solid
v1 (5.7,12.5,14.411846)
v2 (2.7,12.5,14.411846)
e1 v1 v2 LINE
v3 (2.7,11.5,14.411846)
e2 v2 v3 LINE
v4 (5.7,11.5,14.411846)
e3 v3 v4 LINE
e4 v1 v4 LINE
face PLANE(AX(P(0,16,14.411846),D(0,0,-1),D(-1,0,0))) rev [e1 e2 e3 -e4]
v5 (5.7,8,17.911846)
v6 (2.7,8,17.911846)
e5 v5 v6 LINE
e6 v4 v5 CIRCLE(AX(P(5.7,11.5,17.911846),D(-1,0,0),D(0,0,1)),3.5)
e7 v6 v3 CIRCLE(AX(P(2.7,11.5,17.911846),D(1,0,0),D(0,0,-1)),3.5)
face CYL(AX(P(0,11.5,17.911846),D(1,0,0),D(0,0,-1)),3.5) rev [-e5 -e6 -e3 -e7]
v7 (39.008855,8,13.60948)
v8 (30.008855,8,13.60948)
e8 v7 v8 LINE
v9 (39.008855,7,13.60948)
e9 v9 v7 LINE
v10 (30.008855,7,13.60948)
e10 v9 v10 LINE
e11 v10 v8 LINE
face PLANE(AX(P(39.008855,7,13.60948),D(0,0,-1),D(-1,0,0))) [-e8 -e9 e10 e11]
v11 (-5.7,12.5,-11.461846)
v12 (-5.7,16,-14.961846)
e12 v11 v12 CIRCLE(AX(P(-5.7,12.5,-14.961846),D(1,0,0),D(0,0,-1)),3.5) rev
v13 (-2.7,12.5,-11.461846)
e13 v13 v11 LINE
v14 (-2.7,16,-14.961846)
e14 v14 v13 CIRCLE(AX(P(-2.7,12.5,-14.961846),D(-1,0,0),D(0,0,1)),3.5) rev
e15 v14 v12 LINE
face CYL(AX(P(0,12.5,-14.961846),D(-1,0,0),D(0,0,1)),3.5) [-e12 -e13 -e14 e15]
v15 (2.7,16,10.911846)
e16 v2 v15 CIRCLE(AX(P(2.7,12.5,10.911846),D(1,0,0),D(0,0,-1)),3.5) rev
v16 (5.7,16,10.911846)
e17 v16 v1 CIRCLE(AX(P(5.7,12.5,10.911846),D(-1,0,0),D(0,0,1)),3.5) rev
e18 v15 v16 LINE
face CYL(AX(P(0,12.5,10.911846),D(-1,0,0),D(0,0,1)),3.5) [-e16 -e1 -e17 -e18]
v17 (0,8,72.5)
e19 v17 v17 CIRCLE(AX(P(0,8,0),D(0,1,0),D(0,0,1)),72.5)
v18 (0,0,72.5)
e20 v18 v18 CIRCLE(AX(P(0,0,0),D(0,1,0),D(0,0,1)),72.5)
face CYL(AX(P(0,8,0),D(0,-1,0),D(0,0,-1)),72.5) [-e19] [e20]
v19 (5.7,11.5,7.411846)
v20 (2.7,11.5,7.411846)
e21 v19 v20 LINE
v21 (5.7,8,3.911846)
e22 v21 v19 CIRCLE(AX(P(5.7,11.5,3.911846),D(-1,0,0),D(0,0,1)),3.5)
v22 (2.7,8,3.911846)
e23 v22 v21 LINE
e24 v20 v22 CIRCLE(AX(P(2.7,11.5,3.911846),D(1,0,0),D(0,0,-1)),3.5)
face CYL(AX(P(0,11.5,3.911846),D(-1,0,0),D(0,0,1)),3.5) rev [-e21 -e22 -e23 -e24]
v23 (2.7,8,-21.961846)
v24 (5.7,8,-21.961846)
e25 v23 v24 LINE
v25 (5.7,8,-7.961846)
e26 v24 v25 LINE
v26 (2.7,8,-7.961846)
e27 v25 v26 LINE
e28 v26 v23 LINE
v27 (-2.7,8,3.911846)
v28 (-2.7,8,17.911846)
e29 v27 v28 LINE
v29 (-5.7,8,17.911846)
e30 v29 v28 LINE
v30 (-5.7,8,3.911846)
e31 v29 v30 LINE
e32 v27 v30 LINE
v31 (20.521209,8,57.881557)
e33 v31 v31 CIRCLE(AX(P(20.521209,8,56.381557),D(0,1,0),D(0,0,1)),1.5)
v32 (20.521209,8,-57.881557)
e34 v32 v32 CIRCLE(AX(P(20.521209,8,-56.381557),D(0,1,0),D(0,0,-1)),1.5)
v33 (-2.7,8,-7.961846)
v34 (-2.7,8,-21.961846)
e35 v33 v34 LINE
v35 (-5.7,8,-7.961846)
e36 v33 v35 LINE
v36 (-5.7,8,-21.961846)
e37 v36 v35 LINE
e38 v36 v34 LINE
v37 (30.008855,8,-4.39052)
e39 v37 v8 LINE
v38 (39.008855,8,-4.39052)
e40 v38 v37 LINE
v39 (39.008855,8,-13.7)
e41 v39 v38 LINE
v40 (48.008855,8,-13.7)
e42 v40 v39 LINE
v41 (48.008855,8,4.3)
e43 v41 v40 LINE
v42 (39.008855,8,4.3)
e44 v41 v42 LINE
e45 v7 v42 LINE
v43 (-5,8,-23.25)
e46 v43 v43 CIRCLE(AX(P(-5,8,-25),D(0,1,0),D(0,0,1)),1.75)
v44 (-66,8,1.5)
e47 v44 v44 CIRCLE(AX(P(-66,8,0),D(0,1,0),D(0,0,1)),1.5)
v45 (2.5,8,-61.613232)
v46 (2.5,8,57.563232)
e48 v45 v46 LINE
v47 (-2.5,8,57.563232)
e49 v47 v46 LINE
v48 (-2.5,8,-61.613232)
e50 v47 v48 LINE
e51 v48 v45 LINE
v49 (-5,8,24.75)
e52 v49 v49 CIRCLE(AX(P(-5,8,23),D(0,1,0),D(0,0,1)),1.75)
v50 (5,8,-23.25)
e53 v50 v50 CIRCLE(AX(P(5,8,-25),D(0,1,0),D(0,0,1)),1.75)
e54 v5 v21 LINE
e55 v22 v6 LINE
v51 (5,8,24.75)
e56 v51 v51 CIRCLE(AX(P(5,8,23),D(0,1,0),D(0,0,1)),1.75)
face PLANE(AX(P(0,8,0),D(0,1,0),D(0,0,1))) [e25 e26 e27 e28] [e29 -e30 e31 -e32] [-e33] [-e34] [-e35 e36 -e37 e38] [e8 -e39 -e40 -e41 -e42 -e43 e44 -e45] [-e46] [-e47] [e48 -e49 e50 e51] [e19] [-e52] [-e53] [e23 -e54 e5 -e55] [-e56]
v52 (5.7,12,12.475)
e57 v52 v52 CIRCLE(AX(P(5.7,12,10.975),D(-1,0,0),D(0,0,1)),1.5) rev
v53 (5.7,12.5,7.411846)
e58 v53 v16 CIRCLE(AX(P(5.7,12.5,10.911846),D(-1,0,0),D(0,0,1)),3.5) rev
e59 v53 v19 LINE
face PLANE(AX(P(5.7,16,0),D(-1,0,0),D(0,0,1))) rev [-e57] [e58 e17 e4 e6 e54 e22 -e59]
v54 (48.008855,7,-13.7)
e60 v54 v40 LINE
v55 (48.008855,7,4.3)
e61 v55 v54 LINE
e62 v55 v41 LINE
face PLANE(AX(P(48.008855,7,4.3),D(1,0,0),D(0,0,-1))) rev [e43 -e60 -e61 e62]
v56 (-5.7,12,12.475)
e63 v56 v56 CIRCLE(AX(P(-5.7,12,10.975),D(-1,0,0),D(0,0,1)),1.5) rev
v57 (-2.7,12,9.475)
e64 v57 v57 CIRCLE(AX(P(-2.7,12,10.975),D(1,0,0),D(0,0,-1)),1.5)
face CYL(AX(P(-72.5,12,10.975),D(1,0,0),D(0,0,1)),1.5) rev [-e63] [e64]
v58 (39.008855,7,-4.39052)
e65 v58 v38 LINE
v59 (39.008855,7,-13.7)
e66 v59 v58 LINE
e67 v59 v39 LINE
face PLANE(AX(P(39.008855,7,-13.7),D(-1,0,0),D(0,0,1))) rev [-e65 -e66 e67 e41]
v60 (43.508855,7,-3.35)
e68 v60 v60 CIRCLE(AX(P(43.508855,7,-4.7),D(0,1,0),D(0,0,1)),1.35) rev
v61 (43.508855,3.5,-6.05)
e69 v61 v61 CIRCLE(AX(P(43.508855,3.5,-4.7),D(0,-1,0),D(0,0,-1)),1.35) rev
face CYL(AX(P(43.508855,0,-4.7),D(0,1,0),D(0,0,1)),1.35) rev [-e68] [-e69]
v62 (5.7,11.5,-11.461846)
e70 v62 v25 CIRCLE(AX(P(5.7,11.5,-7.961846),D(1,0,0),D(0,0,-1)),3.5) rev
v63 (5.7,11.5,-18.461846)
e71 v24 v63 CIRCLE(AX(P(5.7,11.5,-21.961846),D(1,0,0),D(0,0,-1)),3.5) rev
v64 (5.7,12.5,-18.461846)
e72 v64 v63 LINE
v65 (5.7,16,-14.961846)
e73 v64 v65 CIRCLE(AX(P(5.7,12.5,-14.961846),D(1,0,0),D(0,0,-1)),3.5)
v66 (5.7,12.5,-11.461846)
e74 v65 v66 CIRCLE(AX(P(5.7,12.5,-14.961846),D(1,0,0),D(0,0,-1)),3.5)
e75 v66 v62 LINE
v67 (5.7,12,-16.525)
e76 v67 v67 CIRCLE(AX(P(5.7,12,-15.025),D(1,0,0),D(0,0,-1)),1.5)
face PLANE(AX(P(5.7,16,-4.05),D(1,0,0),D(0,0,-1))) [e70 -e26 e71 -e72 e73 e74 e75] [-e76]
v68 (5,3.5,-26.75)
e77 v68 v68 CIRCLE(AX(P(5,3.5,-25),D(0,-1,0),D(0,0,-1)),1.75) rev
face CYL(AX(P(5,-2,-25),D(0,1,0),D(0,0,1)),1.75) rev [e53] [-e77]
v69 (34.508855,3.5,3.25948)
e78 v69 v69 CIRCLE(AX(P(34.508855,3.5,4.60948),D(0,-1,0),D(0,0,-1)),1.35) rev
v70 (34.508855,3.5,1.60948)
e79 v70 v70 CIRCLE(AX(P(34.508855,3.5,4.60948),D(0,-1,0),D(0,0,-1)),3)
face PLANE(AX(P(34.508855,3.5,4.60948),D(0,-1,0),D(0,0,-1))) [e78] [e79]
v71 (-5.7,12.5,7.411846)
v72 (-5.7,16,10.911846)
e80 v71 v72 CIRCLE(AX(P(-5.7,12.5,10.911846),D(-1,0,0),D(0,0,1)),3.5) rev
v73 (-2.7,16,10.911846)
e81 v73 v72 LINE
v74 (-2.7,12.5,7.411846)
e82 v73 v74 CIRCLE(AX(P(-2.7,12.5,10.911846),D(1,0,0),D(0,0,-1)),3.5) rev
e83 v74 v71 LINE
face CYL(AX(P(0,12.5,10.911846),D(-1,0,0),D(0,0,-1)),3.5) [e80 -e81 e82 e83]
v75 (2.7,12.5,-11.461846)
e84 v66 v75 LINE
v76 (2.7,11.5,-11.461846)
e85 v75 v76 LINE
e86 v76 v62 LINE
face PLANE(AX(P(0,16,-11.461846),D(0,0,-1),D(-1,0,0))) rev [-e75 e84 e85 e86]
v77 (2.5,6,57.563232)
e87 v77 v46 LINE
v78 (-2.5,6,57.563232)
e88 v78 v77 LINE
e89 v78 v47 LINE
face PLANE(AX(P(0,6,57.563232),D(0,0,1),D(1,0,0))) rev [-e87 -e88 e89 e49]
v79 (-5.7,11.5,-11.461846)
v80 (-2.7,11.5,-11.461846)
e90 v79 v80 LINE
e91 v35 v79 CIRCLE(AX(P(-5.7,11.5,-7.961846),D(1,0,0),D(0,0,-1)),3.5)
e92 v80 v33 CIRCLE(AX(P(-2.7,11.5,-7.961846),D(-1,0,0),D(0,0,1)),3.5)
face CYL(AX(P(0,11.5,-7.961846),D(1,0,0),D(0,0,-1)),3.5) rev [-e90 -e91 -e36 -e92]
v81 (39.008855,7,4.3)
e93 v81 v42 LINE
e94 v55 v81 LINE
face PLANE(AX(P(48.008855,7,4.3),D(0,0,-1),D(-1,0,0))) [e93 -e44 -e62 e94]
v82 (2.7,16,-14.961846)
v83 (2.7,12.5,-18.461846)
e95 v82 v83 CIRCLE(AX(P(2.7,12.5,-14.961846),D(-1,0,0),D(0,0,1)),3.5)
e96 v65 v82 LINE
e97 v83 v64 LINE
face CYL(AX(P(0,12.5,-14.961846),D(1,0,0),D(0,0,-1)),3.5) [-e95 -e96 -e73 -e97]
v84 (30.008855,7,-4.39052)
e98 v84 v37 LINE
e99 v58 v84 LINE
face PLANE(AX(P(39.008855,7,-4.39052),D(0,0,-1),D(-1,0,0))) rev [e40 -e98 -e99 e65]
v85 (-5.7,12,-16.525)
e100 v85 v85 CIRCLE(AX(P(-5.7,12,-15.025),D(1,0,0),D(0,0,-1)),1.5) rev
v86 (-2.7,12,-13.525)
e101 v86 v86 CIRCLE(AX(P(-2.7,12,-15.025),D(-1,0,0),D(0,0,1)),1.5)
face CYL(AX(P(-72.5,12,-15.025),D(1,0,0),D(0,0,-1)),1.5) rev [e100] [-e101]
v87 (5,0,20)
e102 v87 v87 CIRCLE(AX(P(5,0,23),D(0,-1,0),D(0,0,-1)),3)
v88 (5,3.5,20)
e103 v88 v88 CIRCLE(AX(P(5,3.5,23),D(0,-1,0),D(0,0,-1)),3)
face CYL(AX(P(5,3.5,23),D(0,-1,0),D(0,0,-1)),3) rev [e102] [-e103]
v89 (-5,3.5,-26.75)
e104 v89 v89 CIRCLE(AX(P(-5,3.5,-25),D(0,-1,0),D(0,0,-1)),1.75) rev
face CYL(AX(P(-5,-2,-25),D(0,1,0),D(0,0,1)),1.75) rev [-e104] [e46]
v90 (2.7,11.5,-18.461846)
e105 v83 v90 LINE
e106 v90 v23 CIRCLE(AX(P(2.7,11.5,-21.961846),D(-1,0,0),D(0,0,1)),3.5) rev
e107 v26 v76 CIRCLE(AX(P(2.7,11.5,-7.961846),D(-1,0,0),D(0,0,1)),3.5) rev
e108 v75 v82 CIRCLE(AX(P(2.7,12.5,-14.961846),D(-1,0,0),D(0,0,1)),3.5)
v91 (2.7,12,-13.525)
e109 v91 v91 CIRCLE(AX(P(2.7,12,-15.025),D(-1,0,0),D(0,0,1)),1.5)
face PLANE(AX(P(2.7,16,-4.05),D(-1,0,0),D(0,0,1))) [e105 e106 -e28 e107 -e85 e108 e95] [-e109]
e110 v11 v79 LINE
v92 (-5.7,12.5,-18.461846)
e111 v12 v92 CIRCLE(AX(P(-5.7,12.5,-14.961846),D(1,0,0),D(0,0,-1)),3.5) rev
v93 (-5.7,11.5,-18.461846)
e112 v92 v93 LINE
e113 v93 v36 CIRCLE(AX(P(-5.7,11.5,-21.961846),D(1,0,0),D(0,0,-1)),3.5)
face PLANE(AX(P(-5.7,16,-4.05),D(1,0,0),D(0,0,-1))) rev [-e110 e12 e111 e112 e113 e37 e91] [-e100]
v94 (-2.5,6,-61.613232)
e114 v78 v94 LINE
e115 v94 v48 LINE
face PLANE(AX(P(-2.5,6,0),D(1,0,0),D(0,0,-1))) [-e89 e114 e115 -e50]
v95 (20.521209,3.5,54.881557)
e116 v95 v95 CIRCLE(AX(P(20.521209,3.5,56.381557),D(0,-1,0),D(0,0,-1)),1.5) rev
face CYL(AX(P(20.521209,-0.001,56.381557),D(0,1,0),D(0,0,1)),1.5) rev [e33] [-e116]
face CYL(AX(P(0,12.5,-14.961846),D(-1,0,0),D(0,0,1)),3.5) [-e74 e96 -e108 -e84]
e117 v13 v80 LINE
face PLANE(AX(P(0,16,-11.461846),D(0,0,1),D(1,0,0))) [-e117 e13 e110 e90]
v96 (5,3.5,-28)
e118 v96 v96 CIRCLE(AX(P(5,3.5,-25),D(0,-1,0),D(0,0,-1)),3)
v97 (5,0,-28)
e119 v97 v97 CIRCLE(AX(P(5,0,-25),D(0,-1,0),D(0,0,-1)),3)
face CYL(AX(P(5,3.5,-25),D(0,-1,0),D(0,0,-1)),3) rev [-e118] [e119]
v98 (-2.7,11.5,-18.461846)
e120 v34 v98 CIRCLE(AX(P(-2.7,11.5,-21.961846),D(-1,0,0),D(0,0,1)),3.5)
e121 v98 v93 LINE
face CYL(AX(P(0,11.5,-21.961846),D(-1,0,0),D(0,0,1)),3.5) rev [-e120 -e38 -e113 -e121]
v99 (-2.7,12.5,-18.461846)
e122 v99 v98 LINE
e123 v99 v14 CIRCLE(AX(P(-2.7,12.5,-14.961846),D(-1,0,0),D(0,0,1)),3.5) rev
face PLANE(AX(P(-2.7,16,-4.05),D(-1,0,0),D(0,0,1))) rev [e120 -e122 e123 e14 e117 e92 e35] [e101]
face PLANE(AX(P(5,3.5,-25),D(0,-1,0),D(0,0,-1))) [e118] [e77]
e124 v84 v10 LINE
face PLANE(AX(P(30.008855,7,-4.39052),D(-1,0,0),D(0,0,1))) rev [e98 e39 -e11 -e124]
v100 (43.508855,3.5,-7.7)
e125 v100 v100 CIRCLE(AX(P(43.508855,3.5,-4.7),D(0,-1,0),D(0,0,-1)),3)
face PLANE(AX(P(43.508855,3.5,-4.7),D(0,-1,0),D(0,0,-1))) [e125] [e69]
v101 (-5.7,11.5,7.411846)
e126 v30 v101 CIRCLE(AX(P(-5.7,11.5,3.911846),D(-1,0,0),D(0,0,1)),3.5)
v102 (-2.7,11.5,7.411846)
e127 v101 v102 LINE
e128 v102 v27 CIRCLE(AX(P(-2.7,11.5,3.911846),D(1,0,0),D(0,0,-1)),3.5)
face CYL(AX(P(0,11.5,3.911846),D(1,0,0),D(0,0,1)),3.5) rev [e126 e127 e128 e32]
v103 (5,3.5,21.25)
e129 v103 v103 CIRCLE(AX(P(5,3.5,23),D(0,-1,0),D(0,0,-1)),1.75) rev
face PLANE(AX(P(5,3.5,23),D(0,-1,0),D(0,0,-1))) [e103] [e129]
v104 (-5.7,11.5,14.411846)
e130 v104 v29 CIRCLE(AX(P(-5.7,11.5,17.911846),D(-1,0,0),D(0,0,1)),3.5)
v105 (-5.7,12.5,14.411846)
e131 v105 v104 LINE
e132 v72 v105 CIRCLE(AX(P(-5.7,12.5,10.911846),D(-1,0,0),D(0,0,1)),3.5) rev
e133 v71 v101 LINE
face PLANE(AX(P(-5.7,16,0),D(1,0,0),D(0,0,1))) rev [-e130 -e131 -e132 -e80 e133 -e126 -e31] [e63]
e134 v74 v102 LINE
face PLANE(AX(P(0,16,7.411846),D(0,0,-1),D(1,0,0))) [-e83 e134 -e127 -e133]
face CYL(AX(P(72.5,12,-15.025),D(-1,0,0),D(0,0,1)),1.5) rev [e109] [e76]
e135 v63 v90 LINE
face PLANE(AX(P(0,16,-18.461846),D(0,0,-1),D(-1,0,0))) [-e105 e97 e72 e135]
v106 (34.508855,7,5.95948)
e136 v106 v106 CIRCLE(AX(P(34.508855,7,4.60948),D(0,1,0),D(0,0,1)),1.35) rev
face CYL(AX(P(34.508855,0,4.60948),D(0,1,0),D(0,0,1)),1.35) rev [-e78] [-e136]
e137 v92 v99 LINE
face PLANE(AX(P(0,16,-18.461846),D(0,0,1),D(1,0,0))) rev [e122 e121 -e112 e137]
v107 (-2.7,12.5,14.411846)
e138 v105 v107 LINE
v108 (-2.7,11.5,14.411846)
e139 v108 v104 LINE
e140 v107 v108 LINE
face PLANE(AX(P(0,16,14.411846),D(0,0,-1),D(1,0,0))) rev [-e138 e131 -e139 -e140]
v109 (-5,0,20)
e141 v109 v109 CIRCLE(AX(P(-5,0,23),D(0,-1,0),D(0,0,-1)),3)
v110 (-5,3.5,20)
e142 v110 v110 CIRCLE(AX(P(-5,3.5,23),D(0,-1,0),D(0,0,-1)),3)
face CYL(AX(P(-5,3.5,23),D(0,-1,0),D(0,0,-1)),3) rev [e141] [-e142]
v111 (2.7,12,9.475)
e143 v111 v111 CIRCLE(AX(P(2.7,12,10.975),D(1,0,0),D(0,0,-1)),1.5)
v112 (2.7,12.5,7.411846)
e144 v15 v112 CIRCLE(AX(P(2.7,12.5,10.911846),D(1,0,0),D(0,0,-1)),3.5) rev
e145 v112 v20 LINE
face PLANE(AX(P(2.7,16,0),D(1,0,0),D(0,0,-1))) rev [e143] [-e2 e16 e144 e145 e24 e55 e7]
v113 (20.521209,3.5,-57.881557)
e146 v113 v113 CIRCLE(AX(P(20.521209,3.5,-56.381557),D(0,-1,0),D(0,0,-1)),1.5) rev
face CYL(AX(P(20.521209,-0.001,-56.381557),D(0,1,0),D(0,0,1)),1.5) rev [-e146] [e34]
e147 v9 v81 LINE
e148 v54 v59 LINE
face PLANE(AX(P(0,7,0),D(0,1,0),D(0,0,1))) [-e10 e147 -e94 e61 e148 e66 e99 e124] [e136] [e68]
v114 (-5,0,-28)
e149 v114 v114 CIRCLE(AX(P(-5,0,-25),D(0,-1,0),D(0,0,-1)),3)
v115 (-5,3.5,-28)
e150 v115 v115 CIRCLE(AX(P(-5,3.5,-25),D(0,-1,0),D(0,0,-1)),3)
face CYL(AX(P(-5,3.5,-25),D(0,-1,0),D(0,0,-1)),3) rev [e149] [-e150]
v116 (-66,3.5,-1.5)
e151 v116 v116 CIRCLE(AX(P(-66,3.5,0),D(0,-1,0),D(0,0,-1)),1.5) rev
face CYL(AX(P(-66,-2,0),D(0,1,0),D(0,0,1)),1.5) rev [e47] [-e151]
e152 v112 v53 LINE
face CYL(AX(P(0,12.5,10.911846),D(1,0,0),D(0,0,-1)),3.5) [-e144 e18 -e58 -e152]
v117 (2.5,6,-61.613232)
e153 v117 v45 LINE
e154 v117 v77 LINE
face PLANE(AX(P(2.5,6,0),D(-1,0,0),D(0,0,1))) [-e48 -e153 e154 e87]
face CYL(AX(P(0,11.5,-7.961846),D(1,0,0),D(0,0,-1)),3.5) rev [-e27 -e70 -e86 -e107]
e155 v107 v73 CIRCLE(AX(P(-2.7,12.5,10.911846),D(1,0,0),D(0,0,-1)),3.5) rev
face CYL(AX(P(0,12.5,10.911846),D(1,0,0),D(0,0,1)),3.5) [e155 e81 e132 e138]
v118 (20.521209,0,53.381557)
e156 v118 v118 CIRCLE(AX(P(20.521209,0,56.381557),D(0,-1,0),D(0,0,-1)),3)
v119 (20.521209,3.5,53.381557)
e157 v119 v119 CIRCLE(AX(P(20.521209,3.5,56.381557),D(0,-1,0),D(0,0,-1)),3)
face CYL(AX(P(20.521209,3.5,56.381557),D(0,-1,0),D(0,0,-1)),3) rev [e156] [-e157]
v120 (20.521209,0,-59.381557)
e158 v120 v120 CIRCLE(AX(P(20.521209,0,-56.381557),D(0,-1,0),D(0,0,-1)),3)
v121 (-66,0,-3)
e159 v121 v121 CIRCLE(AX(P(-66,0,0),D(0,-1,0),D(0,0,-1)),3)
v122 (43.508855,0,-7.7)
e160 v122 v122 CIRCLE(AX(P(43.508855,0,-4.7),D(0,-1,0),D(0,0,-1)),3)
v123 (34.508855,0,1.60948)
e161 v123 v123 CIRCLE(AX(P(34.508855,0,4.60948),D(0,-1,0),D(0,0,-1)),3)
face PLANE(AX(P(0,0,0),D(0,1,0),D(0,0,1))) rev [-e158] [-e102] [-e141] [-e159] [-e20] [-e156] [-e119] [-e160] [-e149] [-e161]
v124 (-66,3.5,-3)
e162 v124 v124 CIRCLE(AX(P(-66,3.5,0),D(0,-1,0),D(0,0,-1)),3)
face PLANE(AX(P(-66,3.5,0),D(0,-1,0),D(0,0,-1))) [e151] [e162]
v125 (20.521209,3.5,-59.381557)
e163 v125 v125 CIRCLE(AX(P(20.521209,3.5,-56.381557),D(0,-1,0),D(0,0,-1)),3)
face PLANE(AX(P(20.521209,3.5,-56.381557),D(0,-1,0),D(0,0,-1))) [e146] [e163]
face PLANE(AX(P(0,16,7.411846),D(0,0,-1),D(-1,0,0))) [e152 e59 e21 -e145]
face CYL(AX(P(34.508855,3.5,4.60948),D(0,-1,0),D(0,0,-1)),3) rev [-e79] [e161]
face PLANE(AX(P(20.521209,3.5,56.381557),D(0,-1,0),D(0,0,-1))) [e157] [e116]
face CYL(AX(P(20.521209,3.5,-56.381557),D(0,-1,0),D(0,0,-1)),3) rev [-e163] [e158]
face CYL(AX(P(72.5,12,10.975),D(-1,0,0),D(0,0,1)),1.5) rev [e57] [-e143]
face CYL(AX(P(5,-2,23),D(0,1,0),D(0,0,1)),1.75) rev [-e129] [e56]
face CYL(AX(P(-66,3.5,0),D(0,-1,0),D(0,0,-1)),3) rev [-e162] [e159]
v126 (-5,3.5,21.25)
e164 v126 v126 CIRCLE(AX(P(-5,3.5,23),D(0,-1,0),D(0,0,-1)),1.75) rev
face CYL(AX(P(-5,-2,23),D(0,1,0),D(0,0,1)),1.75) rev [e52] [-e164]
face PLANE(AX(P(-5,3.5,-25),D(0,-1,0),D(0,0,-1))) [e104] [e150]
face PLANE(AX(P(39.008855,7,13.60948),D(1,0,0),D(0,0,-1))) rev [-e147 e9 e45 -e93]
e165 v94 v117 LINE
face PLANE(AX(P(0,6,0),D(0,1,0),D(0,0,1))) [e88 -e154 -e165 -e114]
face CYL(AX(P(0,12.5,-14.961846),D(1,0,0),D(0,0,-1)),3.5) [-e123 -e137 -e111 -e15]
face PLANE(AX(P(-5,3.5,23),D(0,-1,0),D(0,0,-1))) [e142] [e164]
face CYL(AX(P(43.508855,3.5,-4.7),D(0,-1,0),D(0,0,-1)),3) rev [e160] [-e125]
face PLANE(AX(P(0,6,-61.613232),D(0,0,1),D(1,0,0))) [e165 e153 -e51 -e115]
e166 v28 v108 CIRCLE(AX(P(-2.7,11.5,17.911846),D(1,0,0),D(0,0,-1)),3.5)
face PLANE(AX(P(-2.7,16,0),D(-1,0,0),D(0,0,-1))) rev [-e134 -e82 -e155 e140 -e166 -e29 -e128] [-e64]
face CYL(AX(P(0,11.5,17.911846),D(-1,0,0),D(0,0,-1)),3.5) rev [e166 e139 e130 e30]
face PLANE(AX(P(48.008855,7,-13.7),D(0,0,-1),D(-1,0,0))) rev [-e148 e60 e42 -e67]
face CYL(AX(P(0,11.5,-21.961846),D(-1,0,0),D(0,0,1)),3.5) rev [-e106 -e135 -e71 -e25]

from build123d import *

# Parameters (mm, degrees)
SKETCH_1_R             = 72.5
EXTRUDE_1_DEPTH        = 8
SKETCH_4_R             = 1.75
CUT_EXTRUDE_4_DEPTH    = 10
CUT_EXTRUDE_2_REACH    = 104.842
SKETCH_6_R             = 1.5
SKETCH_10_R            = 1.5
CUT_EXTRUDE_6_DEPTH    = 10
SKETCH_8_W             = 3
SKETCH_8_H             = 7
EXTRUDE_2_DEPTH        = 8
FILLET_1_R             = 3.5
SKETCH_9_R             = 1.5
CUT_EXTRUDE_5_DEPTH    = 106.675399219
FILLET_1_OF_MIRROR_1_R = 3.5
MIRROR_START           = -5.7
MIRROR_2_OUTLINE_R     = 1.5
MIRROR_2_DEPTH         = 3
SKETCH_11_R            = 1.35
CUT_EXTRUDE_7_DEPTH    = 103.842111997
SKETCH_12_W            = 9
SKETCH_12_H            = 18
CUT_EXTRUDE_8_DEPTH    = 1
SKETCH_7_R             = 3
CUT_EXTRUDE_3_DEPTH    = 3.5
SKETCH_14_W            = 5
SKETCH_14_H            = 1
SKETCH_14_H_2          = 117.17646446
CUT_EXTRUDE_9_DEPTH    = 2


# Read off the part's stored shape, not the designer's step: 镜向2
with BuildPart() as part:
    # 草图1 → 凸台-拉伸1 (new body)
    with BuildSketch(Plane(origin=(0, 0, 0), x_dir=(1, 0, 0), z_dir=(0, 1, 0))):
        with Locations(Location((0, 0, 0), (0, 0, 270))):
            Circle(SKETCH_1_R)
    extrude(amount=EXTRUDE_1_DEPTH)

    # 草图4 → 切除-拉伸4 (cut)
    with BuildSketch(Plane(origin=(0, 8, 0), x_dir=(1, 0, 0), z_dir=(0, 1, 0))):
        with Locations(Location((-5, -23, 0), (0, 0, 270))):
            Circle(SKETCH_4_R)
        with Locations(Location((-5, 25, 0), (0, 0, 270))):
            Circle(SKETCH_4_R)
        with Locations(Location((5, 25, 0), (0, 0, 270))):
            Circle(SKETCH_4_R)
        with Locations(Location((5, -23, 0), (0, 0, 270))):
            Circle(SKETCH_4_R)
    extrude(amount=-CUT_EXTRUDE_4_DEPTH, mode=Mode.SUBTRACT)

    # 草图6 → 切除-拉伸2 (cut, up to next)
    with BuildSketch(Plane(origin=(0, 8, 0), x_dir=(1, 0, 0), z_dir=(0, 1, 0)), mode=Mode.PRIVATE) as cut_extrude_2_sk1:
        with Locations(Location((20.5212086, -56.381557247, 0), (0, 0, 270))):
            Circle(SKETCH_6_R)
    cut_extrude_2_tool1 = extrude(cut_extrude_2_sk1.sketch, amount=-CUT_EXTRUDE_2_REACH, mode=Mode.PRIVATE) & part.part
    # 草图6 → 切除-拉伸2 (cut, up to next)
    with BuildSketch(Plane(origin=(0, 8, 0), x_dir=(1, 0, 0), z_dir=(0, 1, 0)), mode=Mode.PRIVATE) as cut_extrude_2_sk2:
        with Locations(Location((20.5212086, 56.381557247, 0), (0, 0, 270))):
            Circle(SKETCH_6_R)
    cut_extrude_2_tool2 = extrude(cut_extrude_2_sk2.sketch, amount=-CUT_EXTRUDE_2_REACH, mode=Mode.PRIVATE) & part.part
    add(cut_extrude_2_tool1.solids().sort_by_distance((20.521209, 8, 56.381557))[0], mode=Mode.SUBTRACT)
    add(cut_extrude_2_tool2.solids().sort_by_distance((20.521209, 8, -56.381557))[0], mode=Mode.SUBTRACT)

    # 草图10 → 切除-拉伸6 (cut)
    with BuildSketch(Plane(origin=(0, 8, 0), x_dir=(1, 0, 0), z_dir=(0, 1, 0))):
        with Locations(Location((-66, 0, 0), (0, 0, 270))):
            Circle(SKETCH_10_R)
    extrude(amount=-CUT_EXTRUDE_6_DEPTH, mode=Mode.SUBTRACT)

    # 草图8 → 凸台-拉伸2 (add)
    with BuildSketch(Plane(origin=(0, 8, 0), x_dir=(1, 0, 0), z_dir=(0, 1, 0))):
        with Locations((4.2, -10.911845751)):
            Rectangle(SKETCH_8_W, SKETCH_8_H)
    extrude_2 = extrude(amount=EXTRUDE_2_DEPTH)

    # 圆角1
    fillet_1_edges = [part.edges().sort_by_distance(p)[0] for p in [
        (4.2, 8, 7.411845751),
        (4.2, 8, 14.411845751),
    ]]
    fillet(fillet_1_edges, radius=FILLET_1_R)
    fillet_1_2_edges = [part.edges().sort_by_distance(p)[0] for p in [
        (4.2, 16, 7.411845751),
        (4.2, 16, 14.411845751),
    ]]
    fillet(fillet_1_2_edges, radius=FILLET_1_R - 0.0001)  # a hair under: the kernel refuses the full size

    # 草图9 → 切除-拉伸5 (cut, through all)
    with BuildSketch(Plane(origin=(2.7, 0, 0), x_dir=(0, 0, -1), z_dir=(1, 0, 0))):
        with Locations(Location((-10.975, 12, 0), (0, 0, 180))):
            Circle(SKETCH_9_R)
    cut_extrude_5 = extrude(amount=CUT_EXTRUDE_5_DEPTH, mode=Mode.SUBTRACT)

    # 镜向1: 凸台-拉伸2, 切除-拉伸5 across plane
    add(extrude_2.mirror(Plane.XY.offset(-2.025)))
    add(cut_extrude_5.mirror(Plane.XY.offset(-2.025)), mode=Mode.SUBTRACT)

    # 圆角1 of 镜向1
    fillet_1_of_mirror_1_edges = [part.edges().sort_by_distance(p)[0] for p in [
        (4.2, 8, -11.461845751),
        (4.2, 8, -18.461845751),
    ]]
    fillet(fillet_1_of_mirror_1_edges, radius=FILLET_1_OF_MIRROR_1_R)
    fillet_1_of_mirror_1_2_edges = [part.edges().sort_by_distance(p)[0] for p in [
        (4.2, 16, -11.461845751),
        (4.2, 16, -18.461845751),
    ]]
    fillet(fillet_1_of_mirror_1_2_edges, radius=FILLET_1_OF_MIRROR_1_R - 0.0001)  # a hair under: the kernel refuses the full size

    # 镜向2 outline → 镜向2 (add)
    # profile 1 of 2: a face of its own
    with BuildSketch(Plane.YZ.offset(MIRROR_START)):
        with BuildLine():
            ThreePointArc((11.5, -11.461845751), (9.025126266, -10.436719485), (8, -7.961845751))
            Line((8, -7.961845751), (8, -21.961845751))
            ThreePointArc((8, -21.961845751), (9.025126266, -19.486972017), (11.5, -18.461845751))
            Line((11.5, -18.461845751), (12.5, -18.461845751))
            ThreePointArc((12.5, -18.461845751), (14.974873734, -17.436719485), (16, -14.961845751))
            ThreePointArc((16, -14.961845751), (14.974873734, -12.486972017), (12.5, -11.461845751))
            Line((12.5, -11.461845751), (11.5, -11.461845751))
        make_face()
        with Locations((12, -15.025)):
            Circle(MIRROR_2_OUTLINE_R, mode=Mode.SUBTRACT)
    # profile 2 of 2: a face of its own
    with BuildSketch(Plane.YZ.offset(MIRROR_START)):
        with BuildLine():
            Line((12.5, 14.411845751), (11.5, 14.411845751))
            ThreePointArc((11.5, 14.411845751), (9.025126266, 15.436972017), (8, 17.911845751))
            Line((8, 17.911845751), (8, 3.911845751))
            ThreePointArc((8, 3.911845751), (9.025126266, 6.386719485), (11.5, 7.411845751))
            Line((11.5, 7.411845751), (12.5, 7.411845751))
            ThreePointArc((12.5, 7.411845751), (14.974873734, 8.436972017), (16, 10.911845751))
            ThreePointArc((16, 10.911845751), (14.974873734, 13.386719485), (12.5, 14.411845751))
        make_face()
        with Locations((12, 10.975)):
            Circle(MIRROR_2_OUTLINE_R, mode=Mode.SUBTRACT)
    extrude(amount=MIRROR_2_DEPTH)

    # 草图11 → 切除-拉伸7 (cut, through all)
    with BuildSketch(Plane(origin=(0, 8, 0), x_dir=(1, 0, 0), z_dir=(0, 1, 0))):
        with Locations(Location((34.508854567, -4.60948011, 0), (0, 0, 270))):
            Circle(SKETCH_11_R)
        with Locations(Location((43.508854567, 4.7, 0), (0, 0, 270))):
            Circle(SKETCH_11_R)
    extrude(amount=-CUT_EXTRUDE_7_DEPTH, mode=Mode.SUBTRACT)

    # 草图12 → 切除-拉伸8 (cut)
    with BuildSketch(Plane(origin=(0, 8, 0), x_dir=(1, 0, 0), z_dir=(0, 1, 0))):
        with Locations((43.508854567, 4.7)):
            Rectangle(SKETCH_12_W, SKETCH_12_H)
        with Locations((34.508854567, -4.60948011)):
            Rectangle(SKETCH_12_W, SKETCH_12_H)
    extrude(amount=-CUT_EXTRUDE_8_DEPTH, mode=Mode.SUBTRACT)

    # 草图7 → 切除-拉伸3 (cut)
    with BuildSketch(Plane.XZ):
        with Locations(Location((20.5212086, 56.381557247, 0), (0, 0, 270))):
            Circle(SKETCH_7_R)
        with Locations(Location((20.5212086, -56.381557247, 0), (0, 0, 270))):
            Circle(SKETCH_7_R)
        with Locations(Location((-5, 23, 0), (0, 0, 270))):
            Circle(SKETCH_7_R)
        with Locations(Location((5, 23, 0), (0, 0, 270))):
            Circle(SKETCH_7_R)
        with Locations(Location((5, -25, 0), (0, 0, 270))):
            Circle(SKETCH_7_R)
        with Locations(Location((-5, -25, 0), (0, 0, 270))):
            Circle(SKETCH_7_R)
        with Locations(Location((-66, 0, 0), (0, 0, 270))):
            Circle(SKETCH_7_R)
        with Locations(Location((43.508854567, -4.7, 0), (0, 0, 270))):
            Circle(SKETCH_7_R)
        with Locations(Location((34.508854567, 4.60948011, 0), (0, 0, 270))):
            Circle(SKETCH_7_R)
    extrude(amount=-CUT_EXTRUDE_3_DEPTH, mode=Mode.SUBTRACT)

    # 草图14 → 切除-拉伸9 (cut)
    with BuildSketch(Plane(origin=(0, 8, 0), x_dir=(1, 0, 0), z_dir=(0, 1, 0))):
        with Locations((0, 61.11323223)):
            Rectangle(SKETCH_14_W, SKETCH_14_H)
        with Locations((0, 2.025)):
            Rectangle(SKETCH_14_W, SKETCH_14_H_2)
        with Locations((0, -57.06323223)):
            Rectangle(SKETCH_14_W, SKETCH_14_H)
    extrude(amount=-CUT_EXTRUDE_9_DEPTH, mode=Mode.SUBTRACT)


solid = part.part
